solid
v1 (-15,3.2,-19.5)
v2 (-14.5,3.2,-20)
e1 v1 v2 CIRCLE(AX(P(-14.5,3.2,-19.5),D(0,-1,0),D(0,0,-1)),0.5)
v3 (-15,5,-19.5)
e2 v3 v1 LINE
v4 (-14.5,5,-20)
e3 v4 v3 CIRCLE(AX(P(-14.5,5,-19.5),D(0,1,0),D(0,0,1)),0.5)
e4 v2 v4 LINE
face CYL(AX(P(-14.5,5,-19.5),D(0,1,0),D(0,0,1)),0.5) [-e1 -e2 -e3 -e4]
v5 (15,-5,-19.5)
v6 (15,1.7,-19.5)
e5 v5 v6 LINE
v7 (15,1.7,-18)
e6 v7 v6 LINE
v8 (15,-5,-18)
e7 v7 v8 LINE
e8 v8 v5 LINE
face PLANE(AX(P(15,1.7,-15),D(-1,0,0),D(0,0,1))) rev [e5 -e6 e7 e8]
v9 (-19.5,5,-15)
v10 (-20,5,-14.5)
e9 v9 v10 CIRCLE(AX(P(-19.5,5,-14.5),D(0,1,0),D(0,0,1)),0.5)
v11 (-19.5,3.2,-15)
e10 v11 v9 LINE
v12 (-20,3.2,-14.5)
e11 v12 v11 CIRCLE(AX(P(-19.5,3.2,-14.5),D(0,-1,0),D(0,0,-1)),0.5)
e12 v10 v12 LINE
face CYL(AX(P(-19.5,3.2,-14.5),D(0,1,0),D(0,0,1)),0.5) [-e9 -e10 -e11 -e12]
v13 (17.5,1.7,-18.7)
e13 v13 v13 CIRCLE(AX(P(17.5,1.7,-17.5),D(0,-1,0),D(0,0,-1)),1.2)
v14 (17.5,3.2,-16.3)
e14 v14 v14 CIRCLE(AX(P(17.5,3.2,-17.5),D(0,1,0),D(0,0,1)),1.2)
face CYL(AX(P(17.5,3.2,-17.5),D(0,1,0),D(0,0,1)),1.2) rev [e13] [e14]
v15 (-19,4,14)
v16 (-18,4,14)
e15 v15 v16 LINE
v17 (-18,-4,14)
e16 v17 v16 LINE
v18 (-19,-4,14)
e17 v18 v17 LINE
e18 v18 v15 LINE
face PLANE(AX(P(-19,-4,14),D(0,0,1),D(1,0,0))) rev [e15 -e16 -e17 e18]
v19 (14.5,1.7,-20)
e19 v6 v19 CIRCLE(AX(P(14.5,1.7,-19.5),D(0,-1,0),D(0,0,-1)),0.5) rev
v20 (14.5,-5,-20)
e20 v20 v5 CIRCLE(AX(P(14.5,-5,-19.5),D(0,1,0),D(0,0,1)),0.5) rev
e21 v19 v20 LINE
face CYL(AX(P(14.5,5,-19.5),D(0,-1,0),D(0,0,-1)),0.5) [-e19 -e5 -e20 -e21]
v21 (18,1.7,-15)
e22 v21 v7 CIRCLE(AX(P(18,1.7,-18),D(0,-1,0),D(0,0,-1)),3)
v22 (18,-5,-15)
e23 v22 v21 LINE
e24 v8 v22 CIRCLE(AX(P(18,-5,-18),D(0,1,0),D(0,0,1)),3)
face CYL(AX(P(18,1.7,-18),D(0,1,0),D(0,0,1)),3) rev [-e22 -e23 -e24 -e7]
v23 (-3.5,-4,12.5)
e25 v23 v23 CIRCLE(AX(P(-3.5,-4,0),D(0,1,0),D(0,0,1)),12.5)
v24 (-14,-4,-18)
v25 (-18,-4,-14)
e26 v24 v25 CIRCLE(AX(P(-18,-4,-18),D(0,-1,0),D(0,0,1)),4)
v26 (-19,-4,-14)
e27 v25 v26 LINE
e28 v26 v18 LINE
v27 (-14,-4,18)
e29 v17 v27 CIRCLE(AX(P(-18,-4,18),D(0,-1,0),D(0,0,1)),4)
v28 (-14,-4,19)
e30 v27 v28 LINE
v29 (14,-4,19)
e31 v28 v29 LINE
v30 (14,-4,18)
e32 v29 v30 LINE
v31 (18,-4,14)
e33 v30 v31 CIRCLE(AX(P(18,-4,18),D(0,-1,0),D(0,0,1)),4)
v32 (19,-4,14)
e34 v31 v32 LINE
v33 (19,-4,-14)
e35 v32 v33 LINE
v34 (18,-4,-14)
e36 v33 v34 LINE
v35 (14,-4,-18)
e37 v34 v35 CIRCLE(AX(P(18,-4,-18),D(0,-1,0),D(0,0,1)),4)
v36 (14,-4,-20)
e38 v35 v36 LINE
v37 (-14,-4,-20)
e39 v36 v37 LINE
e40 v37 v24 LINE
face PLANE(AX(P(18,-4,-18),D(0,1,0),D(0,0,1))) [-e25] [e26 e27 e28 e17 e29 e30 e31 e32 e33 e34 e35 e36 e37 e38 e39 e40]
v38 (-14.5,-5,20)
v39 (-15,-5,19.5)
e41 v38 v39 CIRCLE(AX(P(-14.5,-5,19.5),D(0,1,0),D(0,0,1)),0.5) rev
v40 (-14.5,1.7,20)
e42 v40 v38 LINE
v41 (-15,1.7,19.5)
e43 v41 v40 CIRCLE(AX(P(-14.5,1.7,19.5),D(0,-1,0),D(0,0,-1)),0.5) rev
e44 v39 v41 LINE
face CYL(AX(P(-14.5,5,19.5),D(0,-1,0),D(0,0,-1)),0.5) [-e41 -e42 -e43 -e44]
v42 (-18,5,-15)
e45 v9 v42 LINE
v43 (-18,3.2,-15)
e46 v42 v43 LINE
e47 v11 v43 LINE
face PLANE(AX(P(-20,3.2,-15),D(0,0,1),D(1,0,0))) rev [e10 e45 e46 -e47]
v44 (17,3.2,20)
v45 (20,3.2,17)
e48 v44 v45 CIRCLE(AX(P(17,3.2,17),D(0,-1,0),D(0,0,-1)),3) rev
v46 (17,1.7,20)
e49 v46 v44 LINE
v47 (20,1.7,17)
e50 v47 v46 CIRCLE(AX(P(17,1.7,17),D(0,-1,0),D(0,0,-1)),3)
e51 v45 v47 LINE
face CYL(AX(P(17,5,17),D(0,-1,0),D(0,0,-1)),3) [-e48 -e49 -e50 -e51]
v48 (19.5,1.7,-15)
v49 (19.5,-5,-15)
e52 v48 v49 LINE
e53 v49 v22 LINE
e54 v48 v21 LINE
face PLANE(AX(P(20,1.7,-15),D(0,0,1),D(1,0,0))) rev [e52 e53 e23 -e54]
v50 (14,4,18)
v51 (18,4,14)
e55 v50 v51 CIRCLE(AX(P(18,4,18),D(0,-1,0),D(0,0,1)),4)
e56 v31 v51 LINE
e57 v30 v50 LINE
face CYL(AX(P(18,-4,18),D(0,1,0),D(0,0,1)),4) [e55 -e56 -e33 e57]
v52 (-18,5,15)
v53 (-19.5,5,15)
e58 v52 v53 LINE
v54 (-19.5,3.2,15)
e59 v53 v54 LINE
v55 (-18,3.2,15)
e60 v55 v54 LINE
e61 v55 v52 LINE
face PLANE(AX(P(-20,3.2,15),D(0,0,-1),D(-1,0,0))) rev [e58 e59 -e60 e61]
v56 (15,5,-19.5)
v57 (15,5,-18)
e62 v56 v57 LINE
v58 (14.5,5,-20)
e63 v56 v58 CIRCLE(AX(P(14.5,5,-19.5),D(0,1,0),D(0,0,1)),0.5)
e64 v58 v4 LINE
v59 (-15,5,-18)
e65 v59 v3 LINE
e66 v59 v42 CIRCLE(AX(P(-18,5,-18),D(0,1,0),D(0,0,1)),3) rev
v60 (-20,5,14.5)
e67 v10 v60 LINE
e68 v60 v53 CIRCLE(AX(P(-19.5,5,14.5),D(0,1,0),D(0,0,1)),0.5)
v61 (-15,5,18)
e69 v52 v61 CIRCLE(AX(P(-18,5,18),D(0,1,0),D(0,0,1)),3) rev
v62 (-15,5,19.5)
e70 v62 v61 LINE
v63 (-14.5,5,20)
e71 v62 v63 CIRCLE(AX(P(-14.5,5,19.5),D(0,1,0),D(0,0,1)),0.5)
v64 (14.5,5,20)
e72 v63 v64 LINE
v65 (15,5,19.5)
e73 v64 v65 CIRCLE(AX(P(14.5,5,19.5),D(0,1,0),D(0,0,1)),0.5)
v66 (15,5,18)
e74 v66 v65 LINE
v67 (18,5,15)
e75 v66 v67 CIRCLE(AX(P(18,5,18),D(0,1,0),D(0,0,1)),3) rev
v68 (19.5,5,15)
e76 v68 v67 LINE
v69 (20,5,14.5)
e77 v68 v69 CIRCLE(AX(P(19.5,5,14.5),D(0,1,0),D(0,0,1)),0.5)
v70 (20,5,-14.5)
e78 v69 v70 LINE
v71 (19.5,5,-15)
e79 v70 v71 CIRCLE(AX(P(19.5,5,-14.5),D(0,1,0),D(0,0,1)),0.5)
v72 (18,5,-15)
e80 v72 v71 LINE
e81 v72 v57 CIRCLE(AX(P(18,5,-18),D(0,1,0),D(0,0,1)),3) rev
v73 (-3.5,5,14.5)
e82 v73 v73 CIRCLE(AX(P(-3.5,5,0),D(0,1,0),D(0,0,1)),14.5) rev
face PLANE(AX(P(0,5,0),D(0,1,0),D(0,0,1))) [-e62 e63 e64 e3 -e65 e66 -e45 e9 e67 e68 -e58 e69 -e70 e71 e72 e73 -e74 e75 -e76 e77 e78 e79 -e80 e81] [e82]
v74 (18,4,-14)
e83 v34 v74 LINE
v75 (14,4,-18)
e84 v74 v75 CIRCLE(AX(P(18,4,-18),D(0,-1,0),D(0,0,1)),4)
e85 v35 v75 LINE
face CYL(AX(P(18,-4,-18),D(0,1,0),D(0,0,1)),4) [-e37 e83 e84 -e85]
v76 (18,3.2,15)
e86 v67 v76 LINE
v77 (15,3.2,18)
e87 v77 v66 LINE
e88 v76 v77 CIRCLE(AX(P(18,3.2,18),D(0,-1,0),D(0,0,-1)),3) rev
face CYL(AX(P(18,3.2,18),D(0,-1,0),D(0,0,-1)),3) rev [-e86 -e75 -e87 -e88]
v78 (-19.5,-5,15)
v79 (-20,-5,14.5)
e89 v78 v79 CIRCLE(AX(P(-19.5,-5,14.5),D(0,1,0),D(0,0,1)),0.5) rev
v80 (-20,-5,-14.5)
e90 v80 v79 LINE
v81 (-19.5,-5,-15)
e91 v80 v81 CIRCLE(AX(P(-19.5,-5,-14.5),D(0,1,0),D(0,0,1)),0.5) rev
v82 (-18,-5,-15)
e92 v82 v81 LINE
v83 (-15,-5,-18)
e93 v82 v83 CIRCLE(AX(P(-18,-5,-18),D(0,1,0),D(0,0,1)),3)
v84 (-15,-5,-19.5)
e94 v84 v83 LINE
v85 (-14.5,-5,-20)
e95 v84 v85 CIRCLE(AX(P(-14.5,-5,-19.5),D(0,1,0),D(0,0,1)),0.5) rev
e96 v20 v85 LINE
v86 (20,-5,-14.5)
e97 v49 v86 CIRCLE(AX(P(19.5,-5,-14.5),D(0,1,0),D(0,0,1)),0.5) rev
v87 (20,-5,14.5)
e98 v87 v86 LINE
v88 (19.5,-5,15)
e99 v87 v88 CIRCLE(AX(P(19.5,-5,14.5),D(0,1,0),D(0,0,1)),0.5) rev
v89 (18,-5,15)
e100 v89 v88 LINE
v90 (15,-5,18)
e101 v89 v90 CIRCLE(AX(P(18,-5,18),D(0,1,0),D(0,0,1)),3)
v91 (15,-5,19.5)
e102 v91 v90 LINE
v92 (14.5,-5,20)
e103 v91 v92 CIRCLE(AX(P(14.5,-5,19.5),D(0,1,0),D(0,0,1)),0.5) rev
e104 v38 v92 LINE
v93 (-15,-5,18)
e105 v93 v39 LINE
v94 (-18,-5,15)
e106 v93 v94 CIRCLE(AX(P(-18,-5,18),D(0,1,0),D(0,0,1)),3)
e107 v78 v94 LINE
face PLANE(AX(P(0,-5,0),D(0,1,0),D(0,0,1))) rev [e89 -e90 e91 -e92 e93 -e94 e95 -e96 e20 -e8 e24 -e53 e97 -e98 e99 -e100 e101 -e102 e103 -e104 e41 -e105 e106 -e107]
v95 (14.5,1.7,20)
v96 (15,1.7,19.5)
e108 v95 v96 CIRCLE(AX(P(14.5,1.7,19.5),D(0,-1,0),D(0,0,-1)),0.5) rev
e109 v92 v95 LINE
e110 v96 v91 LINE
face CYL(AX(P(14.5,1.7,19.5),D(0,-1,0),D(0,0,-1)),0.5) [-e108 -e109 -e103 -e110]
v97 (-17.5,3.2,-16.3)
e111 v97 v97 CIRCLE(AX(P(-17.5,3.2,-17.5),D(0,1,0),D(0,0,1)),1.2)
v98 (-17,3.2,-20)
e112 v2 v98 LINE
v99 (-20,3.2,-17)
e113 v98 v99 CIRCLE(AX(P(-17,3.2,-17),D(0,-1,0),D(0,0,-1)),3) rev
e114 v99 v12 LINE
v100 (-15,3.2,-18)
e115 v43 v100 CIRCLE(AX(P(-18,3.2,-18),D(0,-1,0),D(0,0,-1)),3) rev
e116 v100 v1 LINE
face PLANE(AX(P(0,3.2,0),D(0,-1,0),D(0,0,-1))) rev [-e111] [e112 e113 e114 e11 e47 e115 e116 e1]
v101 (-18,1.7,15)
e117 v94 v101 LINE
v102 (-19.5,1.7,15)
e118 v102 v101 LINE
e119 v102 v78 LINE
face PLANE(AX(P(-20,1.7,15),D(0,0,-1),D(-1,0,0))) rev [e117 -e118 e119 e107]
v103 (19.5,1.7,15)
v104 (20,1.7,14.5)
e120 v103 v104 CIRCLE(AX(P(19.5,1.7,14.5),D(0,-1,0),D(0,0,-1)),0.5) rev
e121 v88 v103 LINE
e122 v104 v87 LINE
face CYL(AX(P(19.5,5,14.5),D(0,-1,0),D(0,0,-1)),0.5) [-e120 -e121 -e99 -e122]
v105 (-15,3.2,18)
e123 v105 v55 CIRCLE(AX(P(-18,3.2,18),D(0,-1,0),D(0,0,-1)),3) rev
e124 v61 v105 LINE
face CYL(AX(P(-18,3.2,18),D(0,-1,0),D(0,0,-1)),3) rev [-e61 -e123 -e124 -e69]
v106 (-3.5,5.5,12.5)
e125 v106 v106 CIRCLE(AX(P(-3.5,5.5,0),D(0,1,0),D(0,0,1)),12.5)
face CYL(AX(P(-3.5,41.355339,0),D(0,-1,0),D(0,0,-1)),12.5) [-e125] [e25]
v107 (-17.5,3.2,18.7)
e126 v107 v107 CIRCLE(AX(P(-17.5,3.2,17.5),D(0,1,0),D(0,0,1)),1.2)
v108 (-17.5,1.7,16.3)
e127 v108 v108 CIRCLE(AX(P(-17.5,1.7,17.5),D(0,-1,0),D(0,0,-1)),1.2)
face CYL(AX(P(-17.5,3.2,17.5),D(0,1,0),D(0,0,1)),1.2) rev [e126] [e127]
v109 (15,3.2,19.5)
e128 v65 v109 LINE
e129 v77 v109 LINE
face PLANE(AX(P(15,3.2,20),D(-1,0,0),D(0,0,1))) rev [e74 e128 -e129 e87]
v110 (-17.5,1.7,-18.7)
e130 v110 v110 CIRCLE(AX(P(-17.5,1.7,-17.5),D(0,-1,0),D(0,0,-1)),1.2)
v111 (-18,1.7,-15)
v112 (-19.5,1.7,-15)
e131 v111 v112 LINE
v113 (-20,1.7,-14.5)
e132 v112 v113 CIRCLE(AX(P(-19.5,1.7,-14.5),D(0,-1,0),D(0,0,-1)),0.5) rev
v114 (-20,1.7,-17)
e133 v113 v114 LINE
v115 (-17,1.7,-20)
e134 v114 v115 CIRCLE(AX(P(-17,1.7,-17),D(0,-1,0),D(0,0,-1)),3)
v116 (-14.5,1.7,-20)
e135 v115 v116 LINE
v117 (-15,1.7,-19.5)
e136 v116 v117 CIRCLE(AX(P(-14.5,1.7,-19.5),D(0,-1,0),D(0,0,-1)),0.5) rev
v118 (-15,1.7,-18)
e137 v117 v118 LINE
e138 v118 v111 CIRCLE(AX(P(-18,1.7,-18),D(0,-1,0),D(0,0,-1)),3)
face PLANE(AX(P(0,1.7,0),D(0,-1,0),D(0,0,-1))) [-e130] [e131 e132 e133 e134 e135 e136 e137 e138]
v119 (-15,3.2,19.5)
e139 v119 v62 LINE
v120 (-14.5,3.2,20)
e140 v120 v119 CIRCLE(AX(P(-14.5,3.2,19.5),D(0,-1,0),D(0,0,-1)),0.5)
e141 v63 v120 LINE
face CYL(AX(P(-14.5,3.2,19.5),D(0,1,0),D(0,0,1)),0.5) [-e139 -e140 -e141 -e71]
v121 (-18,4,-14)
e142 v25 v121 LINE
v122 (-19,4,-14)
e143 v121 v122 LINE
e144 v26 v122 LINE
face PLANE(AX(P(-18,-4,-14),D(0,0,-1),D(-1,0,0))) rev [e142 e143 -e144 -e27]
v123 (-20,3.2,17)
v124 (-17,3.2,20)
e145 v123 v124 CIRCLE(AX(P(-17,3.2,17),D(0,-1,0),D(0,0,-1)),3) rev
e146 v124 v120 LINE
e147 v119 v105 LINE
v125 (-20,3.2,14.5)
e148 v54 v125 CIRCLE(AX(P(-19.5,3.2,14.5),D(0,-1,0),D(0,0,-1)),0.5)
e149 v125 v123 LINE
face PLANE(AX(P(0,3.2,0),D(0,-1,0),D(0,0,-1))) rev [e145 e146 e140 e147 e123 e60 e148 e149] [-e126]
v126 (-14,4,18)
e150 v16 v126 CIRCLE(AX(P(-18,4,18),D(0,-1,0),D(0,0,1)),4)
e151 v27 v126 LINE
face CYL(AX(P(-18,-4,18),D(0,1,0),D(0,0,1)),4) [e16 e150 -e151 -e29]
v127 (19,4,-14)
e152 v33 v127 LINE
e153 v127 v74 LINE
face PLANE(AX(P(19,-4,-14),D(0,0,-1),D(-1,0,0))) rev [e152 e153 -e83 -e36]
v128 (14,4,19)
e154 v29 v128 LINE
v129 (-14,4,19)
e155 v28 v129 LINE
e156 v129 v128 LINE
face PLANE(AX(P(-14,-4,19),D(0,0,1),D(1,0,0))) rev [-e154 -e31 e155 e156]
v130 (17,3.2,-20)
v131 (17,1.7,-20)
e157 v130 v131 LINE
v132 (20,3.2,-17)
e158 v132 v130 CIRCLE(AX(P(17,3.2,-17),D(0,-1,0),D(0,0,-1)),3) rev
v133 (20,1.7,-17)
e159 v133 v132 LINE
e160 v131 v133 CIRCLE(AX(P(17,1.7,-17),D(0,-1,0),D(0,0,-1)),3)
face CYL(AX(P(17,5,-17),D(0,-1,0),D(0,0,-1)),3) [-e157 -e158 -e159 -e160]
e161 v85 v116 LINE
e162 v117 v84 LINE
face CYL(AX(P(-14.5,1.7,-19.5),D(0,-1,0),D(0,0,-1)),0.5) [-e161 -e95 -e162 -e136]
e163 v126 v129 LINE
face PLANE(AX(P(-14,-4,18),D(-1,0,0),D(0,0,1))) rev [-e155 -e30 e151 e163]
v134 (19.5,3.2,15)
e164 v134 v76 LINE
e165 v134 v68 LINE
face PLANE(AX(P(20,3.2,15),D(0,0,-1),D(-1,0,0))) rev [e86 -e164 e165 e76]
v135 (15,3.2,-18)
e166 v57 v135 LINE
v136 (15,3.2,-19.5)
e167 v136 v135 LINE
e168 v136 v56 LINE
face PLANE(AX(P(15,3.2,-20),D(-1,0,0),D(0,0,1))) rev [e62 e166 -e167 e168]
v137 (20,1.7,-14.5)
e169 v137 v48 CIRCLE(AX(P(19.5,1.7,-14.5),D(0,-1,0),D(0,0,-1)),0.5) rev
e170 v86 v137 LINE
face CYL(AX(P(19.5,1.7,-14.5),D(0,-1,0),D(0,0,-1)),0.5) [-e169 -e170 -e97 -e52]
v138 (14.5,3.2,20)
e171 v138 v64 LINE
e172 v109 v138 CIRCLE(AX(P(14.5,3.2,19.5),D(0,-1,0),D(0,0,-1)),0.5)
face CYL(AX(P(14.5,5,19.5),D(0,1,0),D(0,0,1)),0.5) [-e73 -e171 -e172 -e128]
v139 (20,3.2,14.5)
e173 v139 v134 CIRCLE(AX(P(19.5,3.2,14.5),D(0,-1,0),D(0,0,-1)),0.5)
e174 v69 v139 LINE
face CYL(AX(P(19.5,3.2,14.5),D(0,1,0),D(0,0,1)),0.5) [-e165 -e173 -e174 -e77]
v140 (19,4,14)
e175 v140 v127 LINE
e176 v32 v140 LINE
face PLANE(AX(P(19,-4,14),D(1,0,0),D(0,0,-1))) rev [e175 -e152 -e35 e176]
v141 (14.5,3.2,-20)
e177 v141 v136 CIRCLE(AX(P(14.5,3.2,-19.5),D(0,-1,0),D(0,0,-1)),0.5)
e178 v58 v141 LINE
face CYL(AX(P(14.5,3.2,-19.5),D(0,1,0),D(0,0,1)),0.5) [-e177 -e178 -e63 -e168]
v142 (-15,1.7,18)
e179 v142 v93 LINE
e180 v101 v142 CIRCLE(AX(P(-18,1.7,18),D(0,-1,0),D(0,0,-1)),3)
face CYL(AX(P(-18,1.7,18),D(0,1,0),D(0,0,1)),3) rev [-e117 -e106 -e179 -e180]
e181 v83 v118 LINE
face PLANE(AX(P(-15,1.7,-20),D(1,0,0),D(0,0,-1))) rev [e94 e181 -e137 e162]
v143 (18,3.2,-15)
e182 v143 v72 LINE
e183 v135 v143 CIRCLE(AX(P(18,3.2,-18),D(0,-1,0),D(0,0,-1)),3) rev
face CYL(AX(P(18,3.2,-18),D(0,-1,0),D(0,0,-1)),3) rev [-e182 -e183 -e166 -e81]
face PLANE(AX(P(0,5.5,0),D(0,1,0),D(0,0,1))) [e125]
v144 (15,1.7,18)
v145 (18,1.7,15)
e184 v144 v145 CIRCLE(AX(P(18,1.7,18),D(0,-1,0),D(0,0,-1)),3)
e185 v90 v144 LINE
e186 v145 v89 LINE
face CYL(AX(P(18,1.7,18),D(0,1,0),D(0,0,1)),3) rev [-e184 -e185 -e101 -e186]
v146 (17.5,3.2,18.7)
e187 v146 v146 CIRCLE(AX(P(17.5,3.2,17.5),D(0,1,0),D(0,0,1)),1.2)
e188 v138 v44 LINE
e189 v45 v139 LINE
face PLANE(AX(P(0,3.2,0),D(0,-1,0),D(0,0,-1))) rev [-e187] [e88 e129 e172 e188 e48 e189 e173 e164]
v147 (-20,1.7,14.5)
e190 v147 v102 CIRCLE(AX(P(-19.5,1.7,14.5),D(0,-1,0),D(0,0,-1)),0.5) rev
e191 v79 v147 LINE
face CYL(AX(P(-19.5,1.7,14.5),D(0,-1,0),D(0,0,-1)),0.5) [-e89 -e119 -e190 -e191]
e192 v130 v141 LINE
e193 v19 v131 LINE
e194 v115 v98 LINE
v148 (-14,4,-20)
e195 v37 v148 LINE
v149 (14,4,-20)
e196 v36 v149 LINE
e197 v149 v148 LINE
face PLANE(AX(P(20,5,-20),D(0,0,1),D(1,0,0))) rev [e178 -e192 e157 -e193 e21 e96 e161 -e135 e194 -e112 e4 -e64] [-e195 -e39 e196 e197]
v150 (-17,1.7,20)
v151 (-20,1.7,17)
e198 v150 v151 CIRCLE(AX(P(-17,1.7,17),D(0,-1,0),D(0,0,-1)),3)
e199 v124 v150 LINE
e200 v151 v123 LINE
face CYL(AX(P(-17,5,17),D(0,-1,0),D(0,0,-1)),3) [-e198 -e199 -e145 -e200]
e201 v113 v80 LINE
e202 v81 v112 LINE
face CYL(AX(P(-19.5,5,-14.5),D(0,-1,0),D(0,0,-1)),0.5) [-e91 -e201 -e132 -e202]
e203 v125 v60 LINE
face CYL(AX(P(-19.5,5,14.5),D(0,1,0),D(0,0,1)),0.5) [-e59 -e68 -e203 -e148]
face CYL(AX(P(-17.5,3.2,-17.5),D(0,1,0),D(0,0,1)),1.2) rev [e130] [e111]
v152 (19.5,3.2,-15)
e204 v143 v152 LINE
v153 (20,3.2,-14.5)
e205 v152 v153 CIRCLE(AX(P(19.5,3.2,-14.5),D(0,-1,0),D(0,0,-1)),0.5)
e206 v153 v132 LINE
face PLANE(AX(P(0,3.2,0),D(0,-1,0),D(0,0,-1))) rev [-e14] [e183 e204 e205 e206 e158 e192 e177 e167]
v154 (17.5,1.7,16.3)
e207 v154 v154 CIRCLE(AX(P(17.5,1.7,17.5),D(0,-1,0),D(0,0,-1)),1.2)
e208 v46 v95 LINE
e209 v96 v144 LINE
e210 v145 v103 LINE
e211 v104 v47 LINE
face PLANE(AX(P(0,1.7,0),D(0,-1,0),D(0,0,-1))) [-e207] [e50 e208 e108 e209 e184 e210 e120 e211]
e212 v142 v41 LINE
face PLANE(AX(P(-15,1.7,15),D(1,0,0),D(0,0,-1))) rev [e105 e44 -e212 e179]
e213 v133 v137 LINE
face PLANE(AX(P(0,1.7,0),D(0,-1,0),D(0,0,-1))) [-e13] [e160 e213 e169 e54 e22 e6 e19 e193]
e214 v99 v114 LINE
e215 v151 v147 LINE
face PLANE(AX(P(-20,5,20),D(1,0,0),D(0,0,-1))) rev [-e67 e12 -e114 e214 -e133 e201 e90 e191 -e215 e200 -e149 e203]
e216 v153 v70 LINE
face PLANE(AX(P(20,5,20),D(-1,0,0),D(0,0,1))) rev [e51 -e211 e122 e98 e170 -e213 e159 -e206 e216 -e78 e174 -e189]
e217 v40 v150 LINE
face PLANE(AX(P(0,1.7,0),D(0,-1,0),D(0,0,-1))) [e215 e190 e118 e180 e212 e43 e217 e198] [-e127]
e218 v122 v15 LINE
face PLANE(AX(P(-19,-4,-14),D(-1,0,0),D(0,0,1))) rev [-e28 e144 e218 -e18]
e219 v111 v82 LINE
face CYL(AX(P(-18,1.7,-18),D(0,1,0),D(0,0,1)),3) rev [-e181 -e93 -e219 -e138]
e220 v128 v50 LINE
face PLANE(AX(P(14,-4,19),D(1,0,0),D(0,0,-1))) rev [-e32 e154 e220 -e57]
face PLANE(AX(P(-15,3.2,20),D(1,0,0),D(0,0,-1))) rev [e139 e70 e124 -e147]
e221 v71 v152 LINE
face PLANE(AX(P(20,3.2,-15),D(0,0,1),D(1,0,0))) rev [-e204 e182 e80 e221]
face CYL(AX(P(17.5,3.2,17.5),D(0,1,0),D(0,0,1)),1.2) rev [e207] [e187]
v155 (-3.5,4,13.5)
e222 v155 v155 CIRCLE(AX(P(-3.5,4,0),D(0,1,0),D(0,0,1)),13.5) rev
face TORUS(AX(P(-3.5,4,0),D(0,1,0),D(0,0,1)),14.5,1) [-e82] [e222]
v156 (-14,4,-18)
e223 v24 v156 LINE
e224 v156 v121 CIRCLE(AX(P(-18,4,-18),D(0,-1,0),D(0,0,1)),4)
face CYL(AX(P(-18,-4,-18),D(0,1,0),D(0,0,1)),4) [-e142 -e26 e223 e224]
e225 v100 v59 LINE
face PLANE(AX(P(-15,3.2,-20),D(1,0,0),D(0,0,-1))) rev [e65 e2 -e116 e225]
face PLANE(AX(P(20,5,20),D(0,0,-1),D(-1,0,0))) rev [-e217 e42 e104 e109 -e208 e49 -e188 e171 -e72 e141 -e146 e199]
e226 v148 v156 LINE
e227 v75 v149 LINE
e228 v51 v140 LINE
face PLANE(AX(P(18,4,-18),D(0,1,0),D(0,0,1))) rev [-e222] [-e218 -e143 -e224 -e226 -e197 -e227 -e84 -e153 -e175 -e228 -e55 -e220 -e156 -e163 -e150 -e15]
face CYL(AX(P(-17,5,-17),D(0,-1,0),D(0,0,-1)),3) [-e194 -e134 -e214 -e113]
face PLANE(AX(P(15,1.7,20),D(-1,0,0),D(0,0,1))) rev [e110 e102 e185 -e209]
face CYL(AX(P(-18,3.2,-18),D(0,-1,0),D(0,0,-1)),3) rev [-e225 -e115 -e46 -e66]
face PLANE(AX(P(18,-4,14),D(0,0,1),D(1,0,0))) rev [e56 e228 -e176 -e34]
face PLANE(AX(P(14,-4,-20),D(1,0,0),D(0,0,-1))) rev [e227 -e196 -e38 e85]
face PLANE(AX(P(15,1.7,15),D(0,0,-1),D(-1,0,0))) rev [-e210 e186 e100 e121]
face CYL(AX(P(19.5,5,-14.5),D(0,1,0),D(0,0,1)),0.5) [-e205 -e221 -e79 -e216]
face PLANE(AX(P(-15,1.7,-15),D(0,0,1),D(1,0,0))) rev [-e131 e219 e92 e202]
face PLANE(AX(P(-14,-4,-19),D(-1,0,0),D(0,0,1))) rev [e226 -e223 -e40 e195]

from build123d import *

# Parameters (mm, degrees)
SKETCH_1_W          = 40
SKETCH_1_H          = 40
EXTRUDE_1_DEPTH     = 5
SKETCH_2_W          = 5
SKETCH_2_H          = 5
CUT_EXTRUDE_1_DEPTH = 1.8
SKETCH_4_W          = 5
SKETCH_4_H          = 5
CUT_EXTRUDE_2_DEPTH = 6.7
FILLET_1_R          = 3
HOLE_WIZARD_M2_1_D  = 2.4
FILLET_2_R          = 0.5
CUT_EXTRUDE_3_DEPTH = 4
SKETCH_7_R          = 13.5
CUT_EXTRUDE_4_DEPTH = 9
FILLET_3_R          = 1
SKETCH_9_R          = 12.5
EXTRUDE_2_DEPTH     = 9.5


with BuildPart() as part:
    # ｽｹｯﾁ1 → ﾎﾞｽ - 押し出し1 (new, symmetric)
    with BuildSketch(Plane(origin=(0, 0, 0), x_dir=(1, 0, 0), z_dir=(0, 1, 0))):
        Rectangle(SKETCH_1_W, SKETCH_1_H)
    extrude(amount=EXTRUDE_1_DEPTH, both=True)

    # ｽｹｯﾁ2 → ｶｯﾄ - 押し出し1 (cut)
    with BuildSketch(Plane(origin=(0, 5, 0), x_dir=(1, 0, 0), z_dir=(0, 1, 0))):
        with Locations((17.5, 17.5)):
            Rectangle(SKETCH_2_W, SKETCH_2_H)
        with Locations((-17.5, 17.5)):
            Rectangle(SKETCH_2_W, SKETCH_2_H)
        with Locations((-17.5, -17.5)):
            Rectangle(SKETCH_2_W, SKETCH_2_H)
        with Locations((17.5, -17.5)):
            Rectangle(SKETCH_2_W, SKETCH_2_H)
    extrude(amount=-CUT_EXTRUDE_1_DEPTH, mode=Mode.SUBTRACT)

    # ｽｹｯﾁ4 → ｶｯﾄ - 押し出し2 (cut)
    with BuildSketch(Plane.XZ.offset(5)):
        with Locations((17.5, -17.5)):
            Rectangle(SKETCH_4_W, SKETCH_4_H)
        with Locations((17.5, 17.5)):
            Rectangle(SKETCH_4_W, SKETCH_4_H)
        with Locations((-17.5, 17.5)):
            Rectangle(SKETCH_4_W, SKETCH_4_H)
        with Locations((-17.5, -17.5)):
            Rectangle(SKETCH_4_W, SKETCH_4_H)
    extrude(amount=-CUT_EXTRUDE_2_DEPTH, mode=Mode.SUBTRACT)

    # ﾌｨﾚｯﾄ1
    fillet_1_edges = [part.edges().sort_by_distance(p)[0] for p in [
        (-15, -1.65, -15),
        (20, 2.45, -20),
        (15, 4.1, -15),
        (-20, 2.45, -20),
        (20, 2.45, 20),
        (-20, 2.45, 20),
        (-15, 4.1, -15),
        (-15, 4.1, 15),
        (15, 4.1, 15),
        (15, -1.65, -15),
        (15, -1.65, 15),
        (-15, -1.65, 15),
    ]]
    fillet(fillet_1_edges, radius=FILLET_1_R)

    # M2 すきま穴1 (through all)
    with Locations(Plane(origin=(0, 3.2, 0), x_dir=(1, 0, 0), z_dir=(0, 1, 0))):
        with Locations((-17.5, -17.5), (-17.5, 17.5), (17.5, 17.5), (17.5, -17.5)):
            Hole(HOLE_WIZARD_M2_1_D / 2)

    # ﾌｨﾚｯﾄ2
    fillet_2_edges = [part.edges().sort_by_distance(p)[0] for p in [
        (-15, -1.65, -20),
        (-20, -1.65, -15),
        (20, 4.1, -15),
        (15, 4.1, -20),
        (-15, 4.1, -20),
        (-20, 4.1, -15),
        (-20, 4.1, 15),
        (-15, 4.1, 20),
        (15, 4.1, 20),
        (20, 4.1, 15),
        (20, -1.65, -15),
        (15, -1.65, -20),
        (15, -1.65, 20),
        (20, -1.65, 15),
        (-20, -1.65, 15),
        (-15, -1.65, 20),
    ]]
    fillet(fillet_2_edges, radius=FILLET_2_R)

    # ｽｹｯﾁ8 → ｶｯﾄ - 押し出し3 (cut, symmetric)
    with BuildSketch(Plane(origin=(0, 0, 0), x_dir=(1, 0, 0), z_dir=(0, 1, 0))):
        with BuildLine():
            Line((-14, 19), (-14, 20))
            Line((-14, 20), (14, 20))
            Line((14, 20), (14, 19))
            Line((14, 19), (14, 18))
            ThreePointArc((14, 18), (15.171572875, 15.171572875), (18, 14))
            Line((18, 14), (19, 14))
            Line((19, 14), (19, -14))
            Line((19, -14), (18, -14))
            ThreePointArc((18, -14), (15.171572875, -15.171572875), (14, -18))
            Line((14, -18), (14, -19))
            Line((14, -19), (-14, -19))
            Line((-14, -19), (-14, -18))
            ThreePointArc((-14, -18), (-15.171572875, -15.171572875), (-18, -14))
            Line((-18, -14), (-19, -14))
            Line((-19, -14), (-19, 14))
            Line((-19, 14), (-18, 14))
            ThreePointArc((-18, 14), (-15.171572875, 15.171572875), (-14, 18))
            Line((-14, 18), (-14, 19))
        make_face()
    extrude(amount=CUT_EXTRUDE_3_DEPTH, both=True, mode=Mode.SUBTRACT)

    # ｽｹｯﾁ7 → ｶｯﾄ - 押し出し4 (cut)
    with BuildSketch(Plane.XZ.offset(-5)):
        with Locations(Location((-3.5, 0, 0), (0, 0, 90))):
            Circle(SKETCH_7_R)
    extrude(amount=CUT_EXTRUDE_4_DEPTH, mode=Mode.SUBTRACT)

    # ﾌｨﾚｯﾄ3
    fillet_3_edges = [part.edges().sort_by_distance(p)[0] for p in [
        (-3.5, 5, -13.5),
    ]]
    fillet(fillet_3_edges, radius=FILLET_3_R - 0.0001)  # a hair under: the kernel refuses the full size

    # ｽｹｯﾁ9 → ﾎﾞｽ - 押し出し2 (add)
    with BuildSketch(Plane(origin=(0, -4, 0), x_dir=(1, 0, 0), z_dir=(0, 1, 0))):
        with Locations(Location((-3.5, 0, 0), (0, 0, 270))):
            Circle(SKETCH_9_R)
    extrude(amount=EXTRUDE_2_DEPTH)


solid = part.part
